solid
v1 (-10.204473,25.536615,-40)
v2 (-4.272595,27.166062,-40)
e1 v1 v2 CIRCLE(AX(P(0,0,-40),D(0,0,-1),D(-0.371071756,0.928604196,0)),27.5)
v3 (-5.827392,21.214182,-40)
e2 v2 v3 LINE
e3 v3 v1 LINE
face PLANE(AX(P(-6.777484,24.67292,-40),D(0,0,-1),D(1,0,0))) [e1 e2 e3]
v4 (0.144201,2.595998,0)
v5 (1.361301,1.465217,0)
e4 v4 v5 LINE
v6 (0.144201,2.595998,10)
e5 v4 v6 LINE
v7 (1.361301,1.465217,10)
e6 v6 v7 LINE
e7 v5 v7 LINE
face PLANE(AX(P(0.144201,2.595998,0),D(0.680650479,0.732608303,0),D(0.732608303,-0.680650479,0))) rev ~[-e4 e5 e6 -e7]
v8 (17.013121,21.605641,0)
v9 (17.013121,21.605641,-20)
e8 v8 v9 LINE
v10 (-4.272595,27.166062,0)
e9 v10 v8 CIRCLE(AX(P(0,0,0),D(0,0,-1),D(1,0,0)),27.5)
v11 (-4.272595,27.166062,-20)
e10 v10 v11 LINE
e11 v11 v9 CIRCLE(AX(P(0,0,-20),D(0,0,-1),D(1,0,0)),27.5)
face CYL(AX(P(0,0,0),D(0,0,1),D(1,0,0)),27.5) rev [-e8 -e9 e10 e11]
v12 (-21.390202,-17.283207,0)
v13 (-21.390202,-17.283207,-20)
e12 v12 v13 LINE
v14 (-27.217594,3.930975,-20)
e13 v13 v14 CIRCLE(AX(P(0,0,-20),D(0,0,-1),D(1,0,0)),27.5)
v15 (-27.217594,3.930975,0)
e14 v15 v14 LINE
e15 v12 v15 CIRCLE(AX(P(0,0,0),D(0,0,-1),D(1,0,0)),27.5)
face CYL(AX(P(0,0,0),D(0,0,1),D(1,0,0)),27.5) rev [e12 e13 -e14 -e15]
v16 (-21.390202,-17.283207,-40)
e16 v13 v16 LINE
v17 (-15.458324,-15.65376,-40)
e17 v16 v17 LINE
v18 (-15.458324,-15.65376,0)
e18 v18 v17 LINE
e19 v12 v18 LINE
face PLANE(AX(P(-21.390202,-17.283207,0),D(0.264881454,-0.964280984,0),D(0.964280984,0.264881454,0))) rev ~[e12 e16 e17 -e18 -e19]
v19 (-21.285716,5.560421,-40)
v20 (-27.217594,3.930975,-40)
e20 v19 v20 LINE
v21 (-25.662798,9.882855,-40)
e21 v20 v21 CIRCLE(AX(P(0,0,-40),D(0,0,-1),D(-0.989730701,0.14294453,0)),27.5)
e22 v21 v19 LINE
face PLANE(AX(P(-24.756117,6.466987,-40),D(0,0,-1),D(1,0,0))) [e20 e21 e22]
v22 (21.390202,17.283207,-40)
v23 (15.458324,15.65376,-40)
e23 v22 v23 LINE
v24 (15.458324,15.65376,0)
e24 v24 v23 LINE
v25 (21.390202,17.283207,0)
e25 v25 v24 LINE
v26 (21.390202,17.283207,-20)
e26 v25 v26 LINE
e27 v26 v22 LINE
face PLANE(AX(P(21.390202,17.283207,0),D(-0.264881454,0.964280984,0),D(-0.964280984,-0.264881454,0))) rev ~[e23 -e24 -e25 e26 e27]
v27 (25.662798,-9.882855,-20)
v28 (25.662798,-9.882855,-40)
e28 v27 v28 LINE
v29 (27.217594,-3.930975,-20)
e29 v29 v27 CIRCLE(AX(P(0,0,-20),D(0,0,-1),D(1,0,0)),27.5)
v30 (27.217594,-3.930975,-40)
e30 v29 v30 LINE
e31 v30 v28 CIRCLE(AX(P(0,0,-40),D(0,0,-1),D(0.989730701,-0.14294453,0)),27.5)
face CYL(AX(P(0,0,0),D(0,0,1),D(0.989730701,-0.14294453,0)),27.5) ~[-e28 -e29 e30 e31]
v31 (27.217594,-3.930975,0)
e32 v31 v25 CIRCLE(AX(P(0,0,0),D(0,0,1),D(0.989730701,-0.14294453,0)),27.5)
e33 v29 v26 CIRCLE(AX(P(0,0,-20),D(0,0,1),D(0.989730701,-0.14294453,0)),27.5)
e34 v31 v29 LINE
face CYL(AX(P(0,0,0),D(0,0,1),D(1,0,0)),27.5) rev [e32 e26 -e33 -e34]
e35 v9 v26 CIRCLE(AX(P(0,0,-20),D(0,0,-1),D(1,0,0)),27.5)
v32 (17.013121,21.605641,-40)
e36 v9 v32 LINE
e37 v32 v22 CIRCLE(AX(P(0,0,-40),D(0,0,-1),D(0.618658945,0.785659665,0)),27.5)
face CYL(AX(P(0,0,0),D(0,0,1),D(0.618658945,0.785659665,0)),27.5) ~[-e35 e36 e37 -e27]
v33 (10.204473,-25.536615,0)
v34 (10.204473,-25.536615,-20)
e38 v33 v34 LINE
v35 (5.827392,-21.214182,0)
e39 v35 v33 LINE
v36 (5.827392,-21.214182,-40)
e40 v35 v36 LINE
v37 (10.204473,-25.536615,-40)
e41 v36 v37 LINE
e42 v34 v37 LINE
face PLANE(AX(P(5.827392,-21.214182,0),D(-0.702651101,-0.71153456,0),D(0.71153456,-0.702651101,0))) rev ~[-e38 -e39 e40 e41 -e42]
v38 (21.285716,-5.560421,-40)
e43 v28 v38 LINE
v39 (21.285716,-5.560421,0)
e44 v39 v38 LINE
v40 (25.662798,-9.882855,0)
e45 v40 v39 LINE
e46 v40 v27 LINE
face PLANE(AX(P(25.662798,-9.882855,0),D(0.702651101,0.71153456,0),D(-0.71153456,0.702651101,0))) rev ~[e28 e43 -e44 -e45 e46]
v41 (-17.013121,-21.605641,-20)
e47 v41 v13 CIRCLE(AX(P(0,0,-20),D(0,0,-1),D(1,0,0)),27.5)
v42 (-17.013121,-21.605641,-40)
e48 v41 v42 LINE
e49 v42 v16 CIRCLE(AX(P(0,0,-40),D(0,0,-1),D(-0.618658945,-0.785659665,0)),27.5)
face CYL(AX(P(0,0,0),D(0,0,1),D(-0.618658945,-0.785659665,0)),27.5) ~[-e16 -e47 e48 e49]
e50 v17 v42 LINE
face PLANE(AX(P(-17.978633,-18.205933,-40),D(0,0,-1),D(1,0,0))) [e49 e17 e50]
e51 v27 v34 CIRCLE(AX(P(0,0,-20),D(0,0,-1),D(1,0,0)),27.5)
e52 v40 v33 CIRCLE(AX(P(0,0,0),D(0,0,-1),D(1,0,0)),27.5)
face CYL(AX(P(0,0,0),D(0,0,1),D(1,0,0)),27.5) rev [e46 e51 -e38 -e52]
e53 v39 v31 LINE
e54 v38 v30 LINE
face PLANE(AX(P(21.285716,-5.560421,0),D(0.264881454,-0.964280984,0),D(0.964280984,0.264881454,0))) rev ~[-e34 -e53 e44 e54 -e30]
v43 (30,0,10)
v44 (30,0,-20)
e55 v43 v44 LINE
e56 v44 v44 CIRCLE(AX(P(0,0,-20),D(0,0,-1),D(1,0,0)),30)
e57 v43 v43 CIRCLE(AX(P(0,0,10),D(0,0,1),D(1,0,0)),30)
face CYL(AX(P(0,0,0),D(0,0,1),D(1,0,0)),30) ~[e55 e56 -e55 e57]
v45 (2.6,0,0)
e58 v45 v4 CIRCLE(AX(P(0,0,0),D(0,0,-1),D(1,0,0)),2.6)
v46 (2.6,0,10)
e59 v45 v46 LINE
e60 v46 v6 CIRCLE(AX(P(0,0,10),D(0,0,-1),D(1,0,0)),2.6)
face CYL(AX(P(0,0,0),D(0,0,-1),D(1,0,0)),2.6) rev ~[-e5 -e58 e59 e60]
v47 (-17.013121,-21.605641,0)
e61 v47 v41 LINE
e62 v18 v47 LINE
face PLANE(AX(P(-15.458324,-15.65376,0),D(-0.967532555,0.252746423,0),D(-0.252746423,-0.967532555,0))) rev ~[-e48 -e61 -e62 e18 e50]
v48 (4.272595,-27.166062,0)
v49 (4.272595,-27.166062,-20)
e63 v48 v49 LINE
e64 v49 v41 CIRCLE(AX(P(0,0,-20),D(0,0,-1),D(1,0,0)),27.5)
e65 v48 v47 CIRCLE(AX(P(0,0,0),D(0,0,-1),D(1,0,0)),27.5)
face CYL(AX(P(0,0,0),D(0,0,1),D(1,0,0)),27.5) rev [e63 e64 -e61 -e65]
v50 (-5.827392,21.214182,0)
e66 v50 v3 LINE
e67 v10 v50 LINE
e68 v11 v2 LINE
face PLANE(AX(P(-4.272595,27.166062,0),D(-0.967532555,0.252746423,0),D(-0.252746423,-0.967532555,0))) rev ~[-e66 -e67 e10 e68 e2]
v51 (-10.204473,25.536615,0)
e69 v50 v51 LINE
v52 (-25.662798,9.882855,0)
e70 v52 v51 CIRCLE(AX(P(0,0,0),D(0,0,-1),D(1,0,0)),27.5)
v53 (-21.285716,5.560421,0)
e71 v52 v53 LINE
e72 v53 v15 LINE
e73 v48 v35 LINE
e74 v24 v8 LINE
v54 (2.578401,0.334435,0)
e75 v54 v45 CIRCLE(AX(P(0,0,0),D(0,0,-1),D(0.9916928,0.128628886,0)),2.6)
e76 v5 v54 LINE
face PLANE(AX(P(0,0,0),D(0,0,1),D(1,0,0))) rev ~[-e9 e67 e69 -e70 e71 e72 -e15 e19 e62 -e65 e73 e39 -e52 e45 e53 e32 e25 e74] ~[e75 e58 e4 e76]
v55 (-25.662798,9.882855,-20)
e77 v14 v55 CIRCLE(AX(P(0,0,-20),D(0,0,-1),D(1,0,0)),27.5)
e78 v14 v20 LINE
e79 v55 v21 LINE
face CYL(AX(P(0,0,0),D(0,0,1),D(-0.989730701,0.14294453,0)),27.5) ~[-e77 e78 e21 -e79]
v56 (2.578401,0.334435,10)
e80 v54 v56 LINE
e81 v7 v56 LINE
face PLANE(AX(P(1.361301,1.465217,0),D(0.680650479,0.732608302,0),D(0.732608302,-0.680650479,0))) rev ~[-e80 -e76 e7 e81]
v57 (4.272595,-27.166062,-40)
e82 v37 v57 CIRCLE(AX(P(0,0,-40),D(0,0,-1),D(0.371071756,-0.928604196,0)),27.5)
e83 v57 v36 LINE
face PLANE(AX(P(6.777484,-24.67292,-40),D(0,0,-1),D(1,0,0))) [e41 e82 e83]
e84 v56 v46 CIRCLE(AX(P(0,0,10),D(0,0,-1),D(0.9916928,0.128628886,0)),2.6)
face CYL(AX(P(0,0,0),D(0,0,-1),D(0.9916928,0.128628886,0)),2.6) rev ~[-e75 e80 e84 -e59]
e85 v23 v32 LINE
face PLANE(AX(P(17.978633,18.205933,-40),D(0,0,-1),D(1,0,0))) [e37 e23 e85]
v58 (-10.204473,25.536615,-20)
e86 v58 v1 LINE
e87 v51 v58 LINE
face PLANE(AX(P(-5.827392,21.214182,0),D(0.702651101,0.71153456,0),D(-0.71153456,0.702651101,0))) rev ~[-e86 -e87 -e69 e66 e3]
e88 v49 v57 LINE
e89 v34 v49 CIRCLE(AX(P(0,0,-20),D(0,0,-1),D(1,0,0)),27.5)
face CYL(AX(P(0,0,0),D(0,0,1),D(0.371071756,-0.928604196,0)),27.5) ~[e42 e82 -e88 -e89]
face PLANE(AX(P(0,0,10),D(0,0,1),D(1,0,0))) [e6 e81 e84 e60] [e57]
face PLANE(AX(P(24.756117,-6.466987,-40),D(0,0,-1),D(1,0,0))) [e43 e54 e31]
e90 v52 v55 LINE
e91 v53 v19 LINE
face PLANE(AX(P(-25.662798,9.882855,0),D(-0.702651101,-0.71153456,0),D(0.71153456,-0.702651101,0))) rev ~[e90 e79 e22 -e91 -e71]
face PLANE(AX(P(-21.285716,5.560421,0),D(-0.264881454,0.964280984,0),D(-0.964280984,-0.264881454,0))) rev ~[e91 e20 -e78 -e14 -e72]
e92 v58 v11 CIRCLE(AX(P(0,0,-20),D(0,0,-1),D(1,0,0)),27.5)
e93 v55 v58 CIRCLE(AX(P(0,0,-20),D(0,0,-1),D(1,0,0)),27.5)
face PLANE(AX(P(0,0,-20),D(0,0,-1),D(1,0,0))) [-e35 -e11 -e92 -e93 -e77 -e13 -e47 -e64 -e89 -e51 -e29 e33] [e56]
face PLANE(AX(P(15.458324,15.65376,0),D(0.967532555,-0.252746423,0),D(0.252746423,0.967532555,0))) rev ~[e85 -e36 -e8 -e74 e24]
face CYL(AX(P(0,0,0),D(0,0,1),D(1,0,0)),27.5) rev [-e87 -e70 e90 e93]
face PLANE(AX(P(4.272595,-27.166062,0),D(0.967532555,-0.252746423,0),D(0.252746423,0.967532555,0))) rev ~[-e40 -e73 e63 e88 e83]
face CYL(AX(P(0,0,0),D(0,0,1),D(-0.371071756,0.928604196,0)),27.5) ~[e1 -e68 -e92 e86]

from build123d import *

# Parameters (mm, degrees)
F1_R     = 30
F2_DEPTH = 10
F5_DEPTH = 40
F3_R     = 30
F3_R_2   = 27.5
F6_DEPTH = 20


with BuildPart() as f2:
    # F1 (on face) → F2 (new body)
    with BuildSketch(Plane.XY):
        Circle(F1_R)
        with BuildLine():
            ThreePointArc((2.6, 0), (-1.8887723072, -1.7867678001), (0.1442006372, 2.5959981079))
            Line((0.1442006372, 2.5959981079), (1.3613009588, 1.465216605))
            Line((1.3613009588, 1.465216605), (2.5784012803, 0.3344351021))
            ThreePointArc((2.5784012803, 0.3344351021), (2.5945947014, 0.1675659141), (2.6, 0))
        make_face(mode=Mode.SUBTRACT)
    extrude(amount=F2_DEPTH)

    # F4 (on face) → F5 (join)
    with BuildSketch(Plane(origin=(0, 0, 0), x_dir=(1, 0, 0), z_dir=(0, 0, -1))):
        with BuildLine():
            Line((25.6627975095, 9.8828550524), (21.2857162159, 5.5604213128))
            Line((21.2857162159, 5.5604213128), (27.2175942873, 3.9309745879))
            ThreePointArc((27.2175942873, 3.9309745879), (26.6071452699, 6.950526641), (25.6627975095, 9.8828550524))
        make_face()
        with BuildLine():
            Line((21.390202292, -17.2832070492), (15.4583242206, -15.6537603243))
            Line((15.4583242206, -15.6537603243), (17.0131209984, -21.6056407888))
            ThreePointArc((17.0131209984, -21.6056407888), (19.3229052758, -19.5672004054), (21.390202292, -17.2832070492))
        make_face()
        with BuildLine():
            Line((4.2725952175, 27.1660621016), (5.8273919953, 21.2141816371))
            Line((5.8273919953, 21.2141816371), (10.2044732889, 25.5366153767))
            ThreePointArc((10.2044732889, 25.5366153767), (7.2842399941, 26.5177270464), (4.2725952175, 27.1660621016))
        make_face()
        with BuildLine():
            Line((-4.2725952175, -27.1660621016), (-5.8273919953, -21.2141816371))
            Line((-5.8273919953, -21.2141816371), (-10.2044732889, -25.5366153767))
            ThreePointArc((-10.2044732889, -25.5366153767), (-7.2842399941, -26.5177270464), (-4.2725952175, -27.1660621016))
        make_face()
        with BuildLine():
            Line((-21.390202292, 17.2832070492), (-15.4583242206, 15.6537603243))
            Line((-15.4583242206, 15.6537603243), (-17.0131209984, 21.6056407888))
            ThreePointArc((-17.0131209984, 21.6056407888), (-19.3229052758, 19.5672004054), (-21.390202292, 17.2832070492))
        make_face()
        with BuildLine():
            Line((-25.6627975095, -9.8828550524), (-21.2857162159, -5.5604213128))
            Line((-21.2857162159, -5.5604213128), (-27.2175942873, -3.9309745879))
            ThreePointArc((-27.2175942873, -3.9309745879), (-26.6071452699, -6.950526641), (-25.6627975095, -9.8828550524))
        make_face()
    extrude(amount=F5_DEPTH)

    # F3 (on face) → F6 (join)
    with BuildSketch(Plane(origin=(0, 0, 0), x_dir=(1, 0, 0), z_dir=(0, 0, -1))):
        Circle(F3_R)
        Circle(F3_R_2, mode=Mode.SUBTRACT)
    extrude(amount=F6_DEPTH)


solid = f2.part
